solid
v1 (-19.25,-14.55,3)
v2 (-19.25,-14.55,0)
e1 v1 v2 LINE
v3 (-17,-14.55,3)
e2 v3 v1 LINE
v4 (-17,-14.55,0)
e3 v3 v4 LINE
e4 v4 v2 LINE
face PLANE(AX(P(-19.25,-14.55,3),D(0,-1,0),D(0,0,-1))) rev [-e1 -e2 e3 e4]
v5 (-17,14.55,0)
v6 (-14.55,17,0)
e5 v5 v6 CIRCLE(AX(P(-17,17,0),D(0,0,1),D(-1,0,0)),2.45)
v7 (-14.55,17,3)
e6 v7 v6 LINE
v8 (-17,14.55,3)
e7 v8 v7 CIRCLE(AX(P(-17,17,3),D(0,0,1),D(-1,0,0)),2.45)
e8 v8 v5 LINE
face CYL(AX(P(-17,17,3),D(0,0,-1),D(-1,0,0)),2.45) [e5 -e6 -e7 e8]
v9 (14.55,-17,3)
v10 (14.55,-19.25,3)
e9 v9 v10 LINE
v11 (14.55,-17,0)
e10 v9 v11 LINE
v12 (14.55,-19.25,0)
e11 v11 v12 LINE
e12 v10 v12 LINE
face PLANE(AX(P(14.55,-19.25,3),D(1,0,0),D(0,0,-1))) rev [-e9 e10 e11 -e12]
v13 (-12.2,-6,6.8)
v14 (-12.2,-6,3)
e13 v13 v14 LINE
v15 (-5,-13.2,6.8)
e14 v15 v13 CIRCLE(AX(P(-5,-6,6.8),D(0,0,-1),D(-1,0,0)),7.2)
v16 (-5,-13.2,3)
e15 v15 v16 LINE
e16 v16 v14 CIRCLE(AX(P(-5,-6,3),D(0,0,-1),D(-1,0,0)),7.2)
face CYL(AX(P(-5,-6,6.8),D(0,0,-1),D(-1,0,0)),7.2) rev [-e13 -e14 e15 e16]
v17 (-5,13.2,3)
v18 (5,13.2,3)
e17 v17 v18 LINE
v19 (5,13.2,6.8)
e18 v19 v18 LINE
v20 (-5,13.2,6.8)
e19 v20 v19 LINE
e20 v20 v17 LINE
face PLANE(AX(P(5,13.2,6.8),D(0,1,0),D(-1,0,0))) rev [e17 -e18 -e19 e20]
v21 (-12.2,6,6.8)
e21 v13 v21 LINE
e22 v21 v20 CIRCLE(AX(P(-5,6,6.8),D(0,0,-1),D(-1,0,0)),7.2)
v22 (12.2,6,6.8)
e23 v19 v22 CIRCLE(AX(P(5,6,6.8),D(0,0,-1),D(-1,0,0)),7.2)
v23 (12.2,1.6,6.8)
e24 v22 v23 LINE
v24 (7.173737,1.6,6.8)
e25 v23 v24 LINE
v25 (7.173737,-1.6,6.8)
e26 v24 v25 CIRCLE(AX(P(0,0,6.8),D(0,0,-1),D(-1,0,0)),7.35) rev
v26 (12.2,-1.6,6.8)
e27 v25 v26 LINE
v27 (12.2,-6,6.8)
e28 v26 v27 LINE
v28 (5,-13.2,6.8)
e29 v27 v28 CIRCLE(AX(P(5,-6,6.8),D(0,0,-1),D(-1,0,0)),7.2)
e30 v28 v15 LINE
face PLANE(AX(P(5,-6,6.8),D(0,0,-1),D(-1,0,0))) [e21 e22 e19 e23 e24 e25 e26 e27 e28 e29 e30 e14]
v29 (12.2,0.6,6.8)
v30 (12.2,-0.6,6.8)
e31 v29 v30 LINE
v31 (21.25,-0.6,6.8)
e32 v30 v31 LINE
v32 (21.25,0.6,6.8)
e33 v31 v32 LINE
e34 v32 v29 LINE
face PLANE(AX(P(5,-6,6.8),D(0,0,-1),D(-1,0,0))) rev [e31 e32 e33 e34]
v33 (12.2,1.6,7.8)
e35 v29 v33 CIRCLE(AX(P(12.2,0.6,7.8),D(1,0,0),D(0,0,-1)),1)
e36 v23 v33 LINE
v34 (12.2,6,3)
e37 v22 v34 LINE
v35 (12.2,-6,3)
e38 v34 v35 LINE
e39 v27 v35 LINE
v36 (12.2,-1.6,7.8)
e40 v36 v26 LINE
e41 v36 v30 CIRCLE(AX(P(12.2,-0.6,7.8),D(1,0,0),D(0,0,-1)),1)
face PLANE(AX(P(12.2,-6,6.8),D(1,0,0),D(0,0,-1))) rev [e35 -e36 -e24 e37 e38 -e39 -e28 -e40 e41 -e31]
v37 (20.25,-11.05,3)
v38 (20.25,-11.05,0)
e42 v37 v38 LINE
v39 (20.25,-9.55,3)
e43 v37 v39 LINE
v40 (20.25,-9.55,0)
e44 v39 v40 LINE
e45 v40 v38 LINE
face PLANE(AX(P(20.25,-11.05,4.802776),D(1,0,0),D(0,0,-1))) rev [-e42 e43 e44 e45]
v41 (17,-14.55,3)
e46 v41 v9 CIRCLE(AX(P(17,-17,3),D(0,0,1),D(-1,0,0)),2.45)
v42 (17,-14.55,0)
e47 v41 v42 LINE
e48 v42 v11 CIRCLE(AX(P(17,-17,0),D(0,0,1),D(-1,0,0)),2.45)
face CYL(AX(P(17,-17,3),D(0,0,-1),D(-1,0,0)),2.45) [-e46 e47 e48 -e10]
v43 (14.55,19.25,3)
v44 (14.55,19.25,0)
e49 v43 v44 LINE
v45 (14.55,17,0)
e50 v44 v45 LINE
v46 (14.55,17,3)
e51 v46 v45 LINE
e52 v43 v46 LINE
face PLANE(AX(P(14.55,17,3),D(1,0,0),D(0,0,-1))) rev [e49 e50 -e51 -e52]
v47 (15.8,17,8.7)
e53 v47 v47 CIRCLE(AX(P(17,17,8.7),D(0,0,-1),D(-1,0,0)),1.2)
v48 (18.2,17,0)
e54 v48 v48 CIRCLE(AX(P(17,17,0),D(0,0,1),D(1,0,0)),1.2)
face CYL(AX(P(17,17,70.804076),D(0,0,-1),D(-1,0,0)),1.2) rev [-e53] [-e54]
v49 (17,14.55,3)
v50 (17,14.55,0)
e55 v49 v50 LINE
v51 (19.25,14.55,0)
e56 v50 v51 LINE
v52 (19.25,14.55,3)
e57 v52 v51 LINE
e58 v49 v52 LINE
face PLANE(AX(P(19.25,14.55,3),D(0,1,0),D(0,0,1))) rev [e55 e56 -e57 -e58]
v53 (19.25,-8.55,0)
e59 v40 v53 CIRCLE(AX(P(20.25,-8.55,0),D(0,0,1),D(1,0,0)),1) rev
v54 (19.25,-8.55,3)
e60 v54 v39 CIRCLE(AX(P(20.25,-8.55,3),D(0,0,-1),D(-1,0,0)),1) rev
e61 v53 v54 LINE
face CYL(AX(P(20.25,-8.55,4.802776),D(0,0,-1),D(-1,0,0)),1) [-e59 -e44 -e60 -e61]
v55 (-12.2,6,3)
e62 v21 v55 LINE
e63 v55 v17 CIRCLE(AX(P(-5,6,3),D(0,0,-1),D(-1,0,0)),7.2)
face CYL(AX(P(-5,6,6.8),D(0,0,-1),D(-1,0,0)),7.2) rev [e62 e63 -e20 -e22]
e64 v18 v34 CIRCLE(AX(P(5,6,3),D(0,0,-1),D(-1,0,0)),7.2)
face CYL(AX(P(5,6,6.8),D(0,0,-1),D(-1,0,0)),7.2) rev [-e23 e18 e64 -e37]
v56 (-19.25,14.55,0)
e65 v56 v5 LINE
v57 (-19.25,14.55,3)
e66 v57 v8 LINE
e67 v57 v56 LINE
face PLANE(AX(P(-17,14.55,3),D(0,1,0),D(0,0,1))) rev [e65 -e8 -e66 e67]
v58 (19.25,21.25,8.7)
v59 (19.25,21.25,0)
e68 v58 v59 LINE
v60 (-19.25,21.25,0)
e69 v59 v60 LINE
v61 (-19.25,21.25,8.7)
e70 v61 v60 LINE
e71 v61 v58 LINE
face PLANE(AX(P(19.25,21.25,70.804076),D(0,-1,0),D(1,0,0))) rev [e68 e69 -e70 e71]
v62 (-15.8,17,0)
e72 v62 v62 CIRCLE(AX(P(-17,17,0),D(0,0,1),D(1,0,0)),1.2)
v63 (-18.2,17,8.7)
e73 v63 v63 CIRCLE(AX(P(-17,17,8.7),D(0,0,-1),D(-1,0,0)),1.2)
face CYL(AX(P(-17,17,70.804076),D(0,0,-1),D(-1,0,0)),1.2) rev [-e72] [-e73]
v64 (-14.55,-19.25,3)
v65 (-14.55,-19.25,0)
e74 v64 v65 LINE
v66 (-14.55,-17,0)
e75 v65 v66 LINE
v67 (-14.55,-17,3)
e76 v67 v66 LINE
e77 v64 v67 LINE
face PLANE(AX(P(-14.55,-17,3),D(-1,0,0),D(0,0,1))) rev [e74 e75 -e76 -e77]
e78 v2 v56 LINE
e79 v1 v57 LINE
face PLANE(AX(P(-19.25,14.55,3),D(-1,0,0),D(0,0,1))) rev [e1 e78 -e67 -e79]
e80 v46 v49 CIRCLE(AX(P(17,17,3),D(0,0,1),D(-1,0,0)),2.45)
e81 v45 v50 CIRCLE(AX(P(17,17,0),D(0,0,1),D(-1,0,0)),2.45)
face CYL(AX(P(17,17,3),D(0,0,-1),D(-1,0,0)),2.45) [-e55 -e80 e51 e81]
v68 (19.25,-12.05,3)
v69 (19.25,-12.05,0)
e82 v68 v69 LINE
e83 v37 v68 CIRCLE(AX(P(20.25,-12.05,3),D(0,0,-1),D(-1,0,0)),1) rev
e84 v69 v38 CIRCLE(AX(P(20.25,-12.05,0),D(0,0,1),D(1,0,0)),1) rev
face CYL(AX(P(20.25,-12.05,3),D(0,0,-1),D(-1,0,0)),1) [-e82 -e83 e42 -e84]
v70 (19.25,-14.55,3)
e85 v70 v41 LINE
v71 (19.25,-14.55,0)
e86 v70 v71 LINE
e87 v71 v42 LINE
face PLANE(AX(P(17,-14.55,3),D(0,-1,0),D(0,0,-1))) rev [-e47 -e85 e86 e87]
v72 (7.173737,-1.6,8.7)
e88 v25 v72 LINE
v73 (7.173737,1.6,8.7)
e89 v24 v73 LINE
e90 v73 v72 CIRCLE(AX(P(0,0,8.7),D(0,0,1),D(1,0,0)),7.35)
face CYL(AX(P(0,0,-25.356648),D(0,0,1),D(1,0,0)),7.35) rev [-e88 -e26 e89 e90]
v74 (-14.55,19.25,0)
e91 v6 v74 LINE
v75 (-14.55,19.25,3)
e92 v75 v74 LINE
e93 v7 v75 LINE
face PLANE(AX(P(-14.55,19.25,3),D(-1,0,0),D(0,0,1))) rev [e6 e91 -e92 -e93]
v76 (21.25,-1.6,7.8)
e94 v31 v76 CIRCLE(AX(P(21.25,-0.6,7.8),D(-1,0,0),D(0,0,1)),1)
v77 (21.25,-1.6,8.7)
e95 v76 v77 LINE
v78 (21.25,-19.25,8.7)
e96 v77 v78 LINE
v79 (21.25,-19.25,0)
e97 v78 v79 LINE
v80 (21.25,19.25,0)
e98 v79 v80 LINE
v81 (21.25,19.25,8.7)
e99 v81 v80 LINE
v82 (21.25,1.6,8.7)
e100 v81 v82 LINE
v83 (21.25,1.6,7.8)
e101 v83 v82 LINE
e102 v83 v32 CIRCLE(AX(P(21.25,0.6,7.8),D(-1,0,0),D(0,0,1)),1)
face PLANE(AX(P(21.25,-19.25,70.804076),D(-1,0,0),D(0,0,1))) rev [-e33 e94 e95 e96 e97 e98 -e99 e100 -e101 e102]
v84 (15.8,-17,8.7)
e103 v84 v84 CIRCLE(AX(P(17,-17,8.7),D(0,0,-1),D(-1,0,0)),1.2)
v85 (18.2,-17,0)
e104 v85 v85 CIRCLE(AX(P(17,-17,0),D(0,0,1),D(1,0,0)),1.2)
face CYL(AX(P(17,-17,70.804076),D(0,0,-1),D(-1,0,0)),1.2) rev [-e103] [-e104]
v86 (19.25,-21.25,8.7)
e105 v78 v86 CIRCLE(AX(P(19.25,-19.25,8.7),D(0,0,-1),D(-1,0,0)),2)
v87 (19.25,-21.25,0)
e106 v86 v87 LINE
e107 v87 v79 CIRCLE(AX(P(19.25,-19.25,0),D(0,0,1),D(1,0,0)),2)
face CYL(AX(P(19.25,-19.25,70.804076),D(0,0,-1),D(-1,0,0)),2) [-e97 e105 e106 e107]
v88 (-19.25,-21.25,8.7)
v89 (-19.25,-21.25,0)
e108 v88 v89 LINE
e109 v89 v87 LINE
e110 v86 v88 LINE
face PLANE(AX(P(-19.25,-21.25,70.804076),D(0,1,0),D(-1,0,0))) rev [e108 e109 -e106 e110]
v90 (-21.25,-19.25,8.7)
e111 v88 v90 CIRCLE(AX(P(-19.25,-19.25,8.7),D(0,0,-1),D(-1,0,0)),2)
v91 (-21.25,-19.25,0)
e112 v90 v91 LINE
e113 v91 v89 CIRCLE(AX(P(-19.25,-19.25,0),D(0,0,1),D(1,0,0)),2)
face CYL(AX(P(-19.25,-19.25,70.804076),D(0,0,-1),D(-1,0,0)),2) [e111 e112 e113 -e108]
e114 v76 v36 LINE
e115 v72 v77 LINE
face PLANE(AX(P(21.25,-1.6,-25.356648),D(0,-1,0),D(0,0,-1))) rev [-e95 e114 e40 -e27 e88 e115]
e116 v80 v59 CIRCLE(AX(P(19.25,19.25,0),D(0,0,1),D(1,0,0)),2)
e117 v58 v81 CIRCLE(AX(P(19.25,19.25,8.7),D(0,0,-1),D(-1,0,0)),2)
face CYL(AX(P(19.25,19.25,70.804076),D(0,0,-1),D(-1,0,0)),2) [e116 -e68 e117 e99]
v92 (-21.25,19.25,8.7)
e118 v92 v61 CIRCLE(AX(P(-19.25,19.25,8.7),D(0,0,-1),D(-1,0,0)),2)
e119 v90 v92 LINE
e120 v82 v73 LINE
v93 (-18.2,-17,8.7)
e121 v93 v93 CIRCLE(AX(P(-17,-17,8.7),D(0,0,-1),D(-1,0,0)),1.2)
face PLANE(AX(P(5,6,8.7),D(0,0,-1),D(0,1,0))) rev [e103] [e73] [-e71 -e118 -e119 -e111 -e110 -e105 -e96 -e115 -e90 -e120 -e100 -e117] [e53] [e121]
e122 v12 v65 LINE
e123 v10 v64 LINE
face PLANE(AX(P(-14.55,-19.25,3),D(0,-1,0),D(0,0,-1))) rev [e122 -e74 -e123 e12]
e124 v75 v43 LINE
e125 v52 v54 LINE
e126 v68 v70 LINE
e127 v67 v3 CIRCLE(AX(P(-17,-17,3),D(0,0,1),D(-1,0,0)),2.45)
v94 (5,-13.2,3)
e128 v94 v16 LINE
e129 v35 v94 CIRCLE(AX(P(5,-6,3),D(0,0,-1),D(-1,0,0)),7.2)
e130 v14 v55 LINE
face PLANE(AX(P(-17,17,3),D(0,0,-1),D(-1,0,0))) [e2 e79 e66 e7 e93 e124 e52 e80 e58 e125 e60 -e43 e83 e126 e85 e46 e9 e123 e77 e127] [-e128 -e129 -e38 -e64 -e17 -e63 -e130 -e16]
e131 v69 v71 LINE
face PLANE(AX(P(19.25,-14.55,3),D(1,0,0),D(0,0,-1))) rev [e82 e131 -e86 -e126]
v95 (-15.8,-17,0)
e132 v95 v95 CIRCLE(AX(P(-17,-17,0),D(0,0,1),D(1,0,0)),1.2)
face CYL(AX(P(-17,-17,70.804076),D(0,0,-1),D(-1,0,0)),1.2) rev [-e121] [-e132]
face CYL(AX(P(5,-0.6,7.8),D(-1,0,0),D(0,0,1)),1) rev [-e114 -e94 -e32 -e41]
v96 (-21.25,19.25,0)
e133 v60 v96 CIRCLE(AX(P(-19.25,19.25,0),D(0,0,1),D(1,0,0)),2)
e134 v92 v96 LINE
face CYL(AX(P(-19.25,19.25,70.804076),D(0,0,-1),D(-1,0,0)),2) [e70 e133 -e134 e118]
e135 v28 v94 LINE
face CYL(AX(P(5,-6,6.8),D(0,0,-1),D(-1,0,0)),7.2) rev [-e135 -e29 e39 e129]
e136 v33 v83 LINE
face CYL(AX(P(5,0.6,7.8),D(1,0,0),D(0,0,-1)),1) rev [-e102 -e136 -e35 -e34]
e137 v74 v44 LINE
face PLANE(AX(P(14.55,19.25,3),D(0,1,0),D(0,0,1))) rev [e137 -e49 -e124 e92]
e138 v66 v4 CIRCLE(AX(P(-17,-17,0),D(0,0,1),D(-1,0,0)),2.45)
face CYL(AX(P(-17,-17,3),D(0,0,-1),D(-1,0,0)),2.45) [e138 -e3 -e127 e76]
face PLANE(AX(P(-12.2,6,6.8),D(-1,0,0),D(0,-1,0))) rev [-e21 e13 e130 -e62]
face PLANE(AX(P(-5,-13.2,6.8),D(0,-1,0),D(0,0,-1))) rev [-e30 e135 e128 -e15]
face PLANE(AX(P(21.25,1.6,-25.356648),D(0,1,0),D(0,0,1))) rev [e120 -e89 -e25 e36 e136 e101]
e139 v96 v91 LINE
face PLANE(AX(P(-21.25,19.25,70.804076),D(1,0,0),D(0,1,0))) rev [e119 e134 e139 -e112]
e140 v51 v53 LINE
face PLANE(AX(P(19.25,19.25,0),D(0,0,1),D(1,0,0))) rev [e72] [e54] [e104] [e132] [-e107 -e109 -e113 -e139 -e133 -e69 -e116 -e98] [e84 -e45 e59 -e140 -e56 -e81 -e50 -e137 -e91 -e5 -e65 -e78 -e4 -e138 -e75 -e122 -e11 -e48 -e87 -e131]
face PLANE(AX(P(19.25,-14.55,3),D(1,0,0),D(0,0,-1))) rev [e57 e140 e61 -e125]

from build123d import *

# Parameters (mm, degrees)
SKETCH1_R           = 1.2
BOSS_EXTRUDE1_DEPTH = 8.7
CUT_EXTRUDE2_DEPTH  = 3
CUT_EXTRUDE3_DEPTH  = 3.8
CUT_EXTRUDE4_DEPTH  = 1.9
SKETCH5_W           = 1
SKETCH5_H           = 1.5
CUT_EXTRUDE5_DEPTH  = 3
FILLET1_R           = 1


with BuildPart() as part:
    # Sketch1 → Boss-Extrude1 (new body)
    with BuildSketch(Plane.XY):
        with BuildLine():
            Line((21.25, -19.25), (21.25, 19.25))
            ThreePointArc((21.25, 19.25), (20.664213562, 20.664213562), (19.25, 21.25))
            Line((19.25, 21.25), (-19.25, 21.25))
            ThreePointArc((-19.25, 21.25), (-20.664213562, 20.664213562), (-21.25, 19.25))
            Line((-21.25, 19.25), (-21.25, -19.25))
            ThreePointArc((-21.25, -19.25), (-20.664213562, -20.664213562), (-19.25, -21.25))
            Line((-19.25, -21.25), (19.25, -21.25))
            ThreePointArc((19.25, -21.25), (20.664213562, -20.664213562), (21.25, -19.25))
        make_face()
        with Locations(Location((-17, -17, 0), (0, 0, 180))):
            Circle(SKETCH1_R, mode=Mode.SUBTRACT)
        with Locations(Location((17, -17, 0), (0, 0, 180))):
            Circle(SKETCH1_R, mode=Mode.SUBTRACT)
        with Locations(Location((17, 17, 0), (0, 0, 180))):
            Circle(SKETCH1_R, mode=Mode.SUBTRACT)
        with Locations(Location((-17, 17, 0), (0, 0, 180))):
            Circle(SKETCH1_R, mode=Mode.SUBTRACT)
    extrude(amount=BOSS_EXTRUDE1_DEPTH)

    # Sketch2 → Cut-Extrude2 (cut)
    with BuildSketch(Plane(origin=(0, 0, 0), x_dir=(-1, 0, 0), z_dir=(0, 0, -1))):
        with BuildLine():
            Line((14.55, -19.25), (-14.55, -19.25))
            Line((-14.55, -19.25), (-14.55, -17))
            ThreePointArc((-14.55, -17), (-15.267588386, -15.267588386), (-17, -14.55))
            Line((-17, -14.55), (-19.25, -14.55))
            Line((-19.25, -14.55), (-19.25, 14.55))
            Line((-19.25, 14.55), (-17, 14.55))
            ThreePointArc((-17, 14.55), (-15.267588386, 15.267588386), (-14.55, 17))
            Line((-14.55, 17), (-14.55, 19.25))
            Line((-14.55, 19.25), (14.55, 19.25))
            Line((14.55, 19.25), (14.55, 17))
            ThreePointArc((14.55, 17), (15.267588386, 15.267588386), (17, 14.55))
            Line((17, 14.55), (19.25, 14.55))
            Line((19.25, 14.55), (19.25, -14.55))
            Line((19.25, -14.55), (17, -14.55))
            ThreePointArc((17, -14.55), (15.267588386, -15.267588386), (14.55, -17))
            Line((14.55, -17), (14.55, -19.25))
        make_face()
    extrude(amount=-CUT_EXTRUDE2_DEPTH, mode=Mode.SUBTRACT)

    # Sketch3 → Cut-Extrude3 (cut)
    with BuildSketch(Plane(origin=(0, 0, 3), x_dir=(-1, 0, 0), z_dir=(0, 0, -1))):
        with BuildLine():
            Line((-12.2, -6), (-12.2, 6))
            ThreePointArc((-12.2, 6), (-10.091168825, 11.091168825), (-5, 13.2))
            Line((-5, 13.2), (5, 13.2))
            ThreePointArc((5, 13.2), (10.091168825, 11.091168825), (12.2, 6))
            Line((12.2, 6), (12.2, -6))
            ThreePointArc((12.2, -6), (10.091168825, -11.091168825), (5, -13.2))
            Line((5, -13.2), (-5, -13.2))
            ThreePointArc((-5, -13.2), (-10.091168825, -11.091168825), (-12.2, -6))
        make_face()
    extrude(amount=-CUT_EXTRUDE3_DEPTH, mode=Mode.SUBTRACT)

    # Sketch4 → Cut-Extrude4 (cut)
    with BuildSketch(Plane.XY.offset(8.7)):
        with BuildLine():
            Line((21.25, 1.6), (7.173736823, 1.6))
            ThreePointArc((7.173736823, 1.6), (-7.35, 0), (7.173736823, -1.6))
            Line((7.173736823, -1.6), (21.25, -1.6))
            Line((21.25, -1.6), (21.25, 1.6))
        make_face()
    extrude(amount=-CUT_EXTRUDE4_DEPTH, mode=Mode.SUBTRACT)

    # Sketch5 → Cut-Extrude5 (cut)
    with BuildSketch(Plane(origin=(0, 0, 0), x_dir=(-1, 0, 0), z_dir=(0, 0, -1))):
        with Locations((-19.75, -10.3)):
            Rectangle(SKETCH5_W, SKETCH5_H)
    extrude(amount=-CUT_EXTRUDE5_DEPTH, mode=Mode.SUBTRACT)

    # Fillet1
    fillet1_edges = [part.edges().sort_by_distance(p)[0] for p in [
        (19.25, -11.05, 1.5),
        (19.25, -9.55, 1.5),
        (16.725, -1.6, 6.8),
        (16.725, 1.6, 6.8),
    ]]
    fillet(fillet1_edges, radius=FILLET1_R - 0.0001)  # a hair under: the kernel refuses the full size


solid = part.part
